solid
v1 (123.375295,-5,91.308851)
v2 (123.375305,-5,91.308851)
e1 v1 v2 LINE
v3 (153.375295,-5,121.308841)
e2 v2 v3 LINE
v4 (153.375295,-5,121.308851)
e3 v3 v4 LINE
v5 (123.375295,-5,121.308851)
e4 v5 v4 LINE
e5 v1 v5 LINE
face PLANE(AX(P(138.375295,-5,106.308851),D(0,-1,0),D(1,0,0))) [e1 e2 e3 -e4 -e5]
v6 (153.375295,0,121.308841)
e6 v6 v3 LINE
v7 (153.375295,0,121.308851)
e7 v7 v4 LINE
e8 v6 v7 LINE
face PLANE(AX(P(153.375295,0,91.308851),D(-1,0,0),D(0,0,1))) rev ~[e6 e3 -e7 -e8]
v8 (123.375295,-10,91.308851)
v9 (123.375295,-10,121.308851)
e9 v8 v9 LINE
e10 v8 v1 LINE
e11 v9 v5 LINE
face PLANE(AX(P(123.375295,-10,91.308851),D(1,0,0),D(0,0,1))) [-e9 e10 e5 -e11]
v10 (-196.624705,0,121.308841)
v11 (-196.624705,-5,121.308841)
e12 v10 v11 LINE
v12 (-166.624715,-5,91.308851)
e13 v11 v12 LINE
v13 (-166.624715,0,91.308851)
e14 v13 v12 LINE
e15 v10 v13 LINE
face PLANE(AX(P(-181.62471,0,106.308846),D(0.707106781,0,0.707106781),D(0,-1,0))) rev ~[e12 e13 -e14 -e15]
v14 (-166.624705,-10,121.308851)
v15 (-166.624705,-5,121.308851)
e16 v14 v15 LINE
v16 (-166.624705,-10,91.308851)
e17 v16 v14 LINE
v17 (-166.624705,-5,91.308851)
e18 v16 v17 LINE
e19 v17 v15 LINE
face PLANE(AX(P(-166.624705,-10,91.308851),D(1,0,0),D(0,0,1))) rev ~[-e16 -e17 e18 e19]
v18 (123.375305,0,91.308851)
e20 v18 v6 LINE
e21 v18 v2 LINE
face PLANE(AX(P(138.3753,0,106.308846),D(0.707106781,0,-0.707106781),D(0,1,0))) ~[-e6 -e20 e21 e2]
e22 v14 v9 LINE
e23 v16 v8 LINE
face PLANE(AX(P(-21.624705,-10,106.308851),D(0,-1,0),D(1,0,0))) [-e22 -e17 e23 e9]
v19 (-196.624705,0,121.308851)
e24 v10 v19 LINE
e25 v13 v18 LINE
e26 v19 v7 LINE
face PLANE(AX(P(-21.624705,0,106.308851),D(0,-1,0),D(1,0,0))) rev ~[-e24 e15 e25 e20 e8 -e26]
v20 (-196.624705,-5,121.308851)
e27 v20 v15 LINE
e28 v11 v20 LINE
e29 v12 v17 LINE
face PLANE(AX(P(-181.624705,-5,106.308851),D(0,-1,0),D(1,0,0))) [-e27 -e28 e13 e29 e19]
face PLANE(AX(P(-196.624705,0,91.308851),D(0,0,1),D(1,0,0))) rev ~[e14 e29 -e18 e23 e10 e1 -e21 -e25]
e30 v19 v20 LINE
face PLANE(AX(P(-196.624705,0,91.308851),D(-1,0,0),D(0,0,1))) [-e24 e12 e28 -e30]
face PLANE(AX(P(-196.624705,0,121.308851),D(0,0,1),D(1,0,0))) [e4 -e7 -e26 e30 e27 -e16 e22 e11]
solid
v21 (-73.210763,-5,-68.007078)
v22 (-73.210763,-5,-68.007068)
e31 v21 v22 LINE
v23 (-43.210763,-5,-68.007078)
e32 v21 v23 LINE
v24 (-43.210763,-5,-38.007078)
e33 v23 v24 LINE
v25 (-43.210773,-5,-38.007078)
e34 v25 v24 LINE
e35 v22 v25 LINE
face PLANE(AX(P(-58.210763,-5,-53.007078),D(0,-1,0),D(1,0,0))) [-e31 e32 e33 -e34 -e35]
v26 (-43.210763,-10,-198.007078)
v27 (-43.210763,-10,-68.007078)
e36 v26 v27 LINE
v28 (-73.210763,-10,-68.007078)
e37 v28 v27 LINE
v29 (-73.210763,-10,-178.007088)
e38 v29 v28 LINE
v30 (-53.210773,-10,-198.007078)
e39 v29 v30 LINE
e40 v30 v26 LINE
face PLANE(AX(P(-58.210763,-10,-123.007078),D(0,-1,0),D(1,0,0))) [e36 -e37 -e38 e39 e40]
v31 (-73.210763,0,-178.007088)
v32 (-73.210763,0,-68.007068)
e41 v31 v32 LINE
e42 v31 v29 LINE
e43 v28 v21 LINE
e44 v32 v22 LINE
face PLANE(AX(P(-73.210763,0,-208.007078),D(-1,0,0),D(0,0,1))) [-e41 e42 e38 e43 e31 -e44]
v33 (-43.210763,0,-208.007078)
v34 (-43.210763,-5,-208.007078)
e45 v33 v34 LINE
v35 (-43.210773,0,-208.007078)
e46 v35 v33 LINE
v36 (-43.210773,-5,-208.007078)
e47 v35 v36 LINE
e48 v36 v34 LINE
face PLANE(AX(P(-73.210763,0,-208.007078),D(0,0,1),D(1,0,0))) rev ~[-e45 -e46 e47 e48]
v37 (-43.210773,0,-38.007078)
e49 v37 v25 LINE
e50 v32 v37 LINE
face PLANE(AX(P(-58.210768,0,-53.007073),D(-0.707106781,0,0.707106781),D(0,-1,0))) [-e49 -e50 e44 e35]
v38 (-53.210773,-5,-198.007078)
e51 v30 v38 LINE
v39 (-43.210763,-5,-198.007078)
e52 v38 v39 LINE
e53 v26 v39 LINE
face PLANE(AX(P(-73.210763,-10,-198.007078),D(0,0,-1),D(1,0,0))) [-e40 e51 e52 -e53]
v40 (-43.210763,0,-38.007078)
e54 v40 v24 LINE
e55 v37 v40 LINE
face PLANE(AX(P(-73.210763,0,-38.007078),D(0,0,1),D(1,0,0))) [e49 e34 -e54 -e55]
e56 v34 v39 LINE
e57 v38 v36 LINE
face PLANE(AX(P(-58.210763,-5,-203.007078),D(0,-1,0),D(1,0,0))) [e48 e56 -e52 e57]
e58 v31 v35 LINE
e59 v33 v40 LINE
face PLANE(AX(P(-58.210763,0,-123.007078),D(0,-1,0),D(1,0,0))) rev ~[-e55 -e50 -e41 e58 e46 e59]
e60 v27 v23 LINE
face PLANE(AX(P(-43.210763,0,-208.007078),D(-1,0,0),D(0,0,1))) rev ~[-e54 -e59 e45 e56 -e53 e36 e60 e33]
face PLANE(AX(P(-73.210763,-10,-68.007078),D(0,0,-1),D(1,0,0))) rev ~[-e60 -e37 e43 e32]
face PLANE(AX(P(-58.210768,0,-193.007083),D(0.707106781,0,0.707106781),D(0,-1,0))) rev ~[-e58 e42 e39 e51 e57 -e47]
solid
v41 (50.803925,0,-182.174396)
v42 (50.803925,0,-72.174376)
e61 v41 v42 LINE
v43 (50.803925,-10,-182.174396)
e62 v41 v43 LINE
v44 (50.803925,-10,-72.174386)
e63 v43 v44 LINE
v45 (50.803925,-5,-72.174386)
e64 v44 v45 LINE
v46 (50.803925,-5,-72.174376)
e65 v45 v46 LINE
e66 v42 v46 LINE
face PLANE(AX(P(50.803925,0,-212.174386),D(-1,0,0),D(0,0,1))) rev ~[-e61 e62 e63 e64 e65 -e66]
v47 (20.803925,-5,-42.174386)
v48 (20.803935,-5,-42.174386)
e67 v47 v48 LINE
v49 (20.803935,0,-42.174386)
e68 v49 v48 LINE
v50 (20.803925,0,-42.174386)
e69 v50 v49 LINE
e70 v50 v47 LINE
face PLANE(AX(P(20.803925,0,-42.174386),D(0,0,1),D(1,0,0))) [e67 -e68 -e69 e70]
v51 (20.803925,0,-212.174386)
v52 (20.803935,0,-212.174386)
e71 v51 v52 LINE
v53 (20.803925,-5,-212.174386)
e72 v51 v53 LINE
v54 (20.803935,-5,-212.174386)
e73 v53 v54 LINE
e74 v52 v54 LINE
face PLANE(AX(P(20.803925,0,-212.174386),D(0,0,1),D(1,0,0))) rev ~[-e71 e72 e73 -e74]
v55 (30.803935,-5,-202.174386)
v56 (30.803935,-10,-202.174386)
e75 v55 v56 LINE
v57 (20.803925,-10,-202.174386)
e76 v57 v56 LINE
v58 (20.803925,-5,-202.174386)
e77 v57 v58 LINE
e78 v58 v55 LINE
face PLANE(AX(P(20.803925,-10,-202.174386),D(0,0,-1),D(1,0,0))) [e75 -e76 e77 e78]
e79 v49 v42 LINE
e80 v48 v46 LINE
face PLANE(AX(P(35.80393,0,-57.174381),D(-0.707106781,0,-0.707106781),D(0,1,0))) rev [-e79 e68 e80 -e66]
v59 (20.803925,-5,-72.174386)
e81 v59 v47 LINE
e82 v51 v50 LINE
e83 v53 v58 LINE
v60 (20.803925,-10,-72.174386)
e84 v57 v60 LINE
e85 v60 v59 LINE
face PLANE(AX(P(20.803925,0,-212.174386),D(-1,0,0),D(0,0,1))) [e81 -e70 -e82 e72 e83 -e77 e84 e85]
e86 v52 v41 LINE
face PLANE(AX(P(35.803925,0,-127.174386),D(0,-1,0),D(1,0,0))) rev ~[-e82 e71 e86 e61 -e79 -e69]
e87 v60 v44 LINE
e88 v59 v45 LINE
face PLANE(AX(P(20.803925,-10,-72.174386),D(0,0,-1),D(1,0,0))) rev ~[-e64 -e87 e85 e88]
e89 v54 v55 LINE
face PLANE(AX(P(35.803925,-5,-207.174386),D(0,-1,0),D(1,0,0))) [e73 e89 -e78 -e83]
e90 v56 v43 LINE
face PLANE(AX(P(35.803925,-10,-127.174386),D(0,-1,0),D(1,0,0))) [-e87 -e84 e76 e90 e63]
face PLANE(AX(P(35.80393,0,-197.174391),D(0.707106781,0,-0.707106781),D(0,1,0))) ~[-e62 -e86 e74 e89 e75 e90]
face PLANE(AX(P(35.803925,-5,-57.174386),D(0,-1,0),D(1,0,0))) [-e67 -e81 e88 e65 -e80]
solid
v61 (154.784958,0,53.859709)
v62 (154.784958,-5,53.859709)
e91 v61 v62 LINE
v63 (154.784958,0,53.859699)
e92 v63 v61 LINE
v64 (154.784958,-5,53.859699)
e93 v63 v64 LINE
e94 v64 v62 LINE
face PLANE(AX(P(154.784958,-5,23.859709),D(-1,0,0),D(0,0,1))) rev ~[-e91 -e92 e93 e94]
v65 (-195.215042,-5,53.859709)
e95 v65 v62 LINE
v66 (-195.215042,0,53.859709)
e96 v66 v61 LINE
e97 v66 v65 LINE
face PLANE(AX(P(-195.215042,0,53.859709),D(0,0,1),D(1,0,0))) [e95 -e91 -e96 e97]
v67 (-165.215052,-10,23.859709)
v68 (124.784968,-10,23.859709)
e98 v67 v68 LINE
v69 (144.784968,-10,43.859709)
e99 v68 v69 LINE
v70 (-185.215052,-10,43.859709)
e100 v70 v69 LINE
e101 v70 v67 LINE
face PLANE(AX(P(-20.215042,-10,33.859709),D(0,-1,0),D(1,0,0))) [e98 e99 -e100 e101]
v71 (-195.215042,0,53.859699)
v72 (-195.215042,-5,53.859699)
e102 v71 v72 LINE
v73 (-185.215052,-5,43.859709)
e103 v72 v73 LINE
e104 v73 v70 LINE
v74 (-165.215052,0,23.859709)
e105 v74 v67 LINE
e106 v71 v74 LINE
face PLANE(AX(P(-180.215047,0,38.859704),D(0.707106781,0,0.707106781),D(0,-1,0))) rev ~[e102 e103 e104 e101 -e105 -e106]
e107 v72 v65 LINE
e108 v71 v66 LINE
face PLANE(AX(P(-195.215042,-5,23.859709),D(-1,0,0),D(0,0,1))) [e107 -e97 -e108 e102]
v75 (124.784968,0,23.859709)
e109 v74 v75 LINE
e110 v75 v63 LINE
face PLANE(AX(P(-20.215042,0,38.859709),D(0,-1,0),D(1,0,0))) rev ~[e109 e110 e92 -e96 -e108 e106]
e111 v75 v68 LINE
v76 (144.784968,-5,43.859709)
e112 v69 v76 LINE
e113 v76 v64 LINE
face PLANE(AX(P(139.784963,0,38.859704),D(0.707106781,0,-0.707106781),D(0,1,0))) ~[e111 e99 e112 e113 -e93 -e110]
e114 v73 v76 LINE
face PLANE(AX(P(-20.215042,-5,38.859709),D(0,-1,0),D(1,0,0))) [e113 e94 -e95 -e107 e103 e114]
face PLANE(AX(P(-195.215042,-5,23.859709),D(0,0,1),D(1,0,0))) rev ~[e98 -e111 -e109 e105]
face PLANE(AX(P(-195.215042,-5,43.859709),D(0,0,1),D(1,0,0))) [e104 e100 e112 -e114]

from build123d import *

# Parameters (mm, degrees)
F0_W       = 350
F0_H       = 30
F1_DEPTH   = 10
F0_W_2     = 30
F0_H_2     = 170
F2_W       = 30
F2_H       = 30
F3_DEPTH   = 5
F4_W       = 30
F4_H       = 30
F4_H_2     = 10
F5_DEPTH   = 5
F6_W       = 30
F6_H       = 30
F6_H_2     = 10
F7_DEPTH   = 5
F8_W       = 350
F8_H       = 30
F9_DEPTH   = 5
F10_W      = 350
F10_H      = 20
F11_DEPTH  = 5
F12_SIZE   = 29.99999
F12_2_SIZE = 29.99999
F12_3_SIZE = 29.99999
F12_4_SIZE = 29.99999


# Not quite as in the source:
# - a fillet or chamfer is up to 0.001 mm smaller than in the source, because OpenCascade refuses the exact size


with BuildPart() as f1:
    # F0 (on Front) → F1 (new body)
    with BuildSketch(Plane.XZ):
        with Locations((-21.6247046013, 106.3088514348)):
            Rectangle(F0_W, F0_H)
    extrude(amount=F1_DEPTH)

    # F2 (on face) → F3 (cut)
    with BuildSketch(Plane.XZ.offset(10)):
        with Locations((-181.6247046013, 106.3088514348)):
            Rectangle(F2_W, F2_H)
        with Locations((138.3752953987, 106.3088514348)):
            Rectangle(F2_W, F2_H)
    extrude(amount=-F3_DEPTH, mode=Mode.SUBTRACT)

    # F12 (size 30 in the source; OpenCascade refuses exactly that, so slightly less here)
    f12_edges = [f1.edges().sort_by_distance(p)[0] for p in [
        (-196.624705, -2.5, 91.308851),
        (153.375295, -2.5, 91.308851),
    ]]
    chamfer(f12_edges, length=F12_SIZE)


with BuildPart() as f1b:
    # F0 (on Front) → F1, piece 2 (new body)
    with BuildSketch(Plane.XZ):
        with Locations((-58.2107634842, -123.0070780963)):
            Rectangle(F0_W_2, F0_H_2)
    extrude(amount=F1_DEPTH)

    # F4 (on face) → F5 (cut)
    with BuildSketch(Plane.XZ.offset(10)):
        with Locations((-58.2107634842, -53.0070780963)):
            Rectangle(F4_W, F4_H)
        with Locations((-58.2107634842, -203.0070780963)):
            Rectangle(F4_W, F4_H_2)
    extrude(amount=-F5_DEPTH, mode=Mode.SUBTRACT)

    # F12#3 (size 30 in the source; OpenCascade refuses exactly that, so slightly less here)
    f12_3_edges = [f1b.edges().sort_by_distance(p)[0] for p in [
        (-73.210763, -2.5, -38.007078),
        (-73.210763, -2.5, -208.007078),
    ]]
    chamfer(f12_3_edges, length=F12_3_SIZE)


with BuildPart() as f1c:
    # F0 (on Front) → F1, piece 3 (new body)
    with BuildSketch(Plane.XZ):
        with Locations((35.80392465, -127.1743857861)):
            Rectangle(F0_W_2, F0_H_2)
    extrude(amount=F1_DEPTH)

    # F6 (on face) → F7 (cut)
    with BuildSketch(Plane.XZ.offset(10)):
        with Locations((35.80392465, -57.1743857861)):
            Rectangle(F6_W, F6_H)
        with Locations((35.80392465, -207.1743857861)):
            Rectangle(F6_W, F6_H_2)
    extrude(amount=-F7_DEPTH, mode=Mode.SUBTRACT)

    # F12#2 (size 30 in the source; OpenCascade refuses exactly that, so slightly less here)
    f12_2_edges = [f1c.edges().sort_by_distance(p)[0] for p in [
        (50.803925, -2.5, -42.174386),
        (50.803925, -2.5, -212.174386),
    ]]
    chamfer(f12_2_edges, length=F12_2_SIZE)


with BuildPart() as f9:
    # F8 (on Front) → F9 (new body)
    with BuildSketch(Plane.XZ):
        with Locations((-20.2150419354, 38.859708766)):
            Rectangle(F8_W, F8_H)
    extrude(amount=F9_DEPTH)

    # F10 (on face) → F11 (join)
    with BuildSketch(Plane.XZ.offset(5)):
        with Locations((-20.2150419354, 33.859708766)):
            Rectangle(F10_W, F10_H)
    extrude(amount=F11_DEPTH)

    # F12#4 (size 30 in the source; OpenCascade refuses exactly that, so slightly less here)
    f12_4_edges = [f9.edges().sort_by_distance(p)[0] for p in [
        (-195.215042, -5, 23.859709),
        (154.784958, -5, 23.859709),
    ]]
    chamfer(f12_4_edges, length=F12_4_SIZE)


solid = Compound([f1.part, f1b.part, f1c.part, f9.part])
